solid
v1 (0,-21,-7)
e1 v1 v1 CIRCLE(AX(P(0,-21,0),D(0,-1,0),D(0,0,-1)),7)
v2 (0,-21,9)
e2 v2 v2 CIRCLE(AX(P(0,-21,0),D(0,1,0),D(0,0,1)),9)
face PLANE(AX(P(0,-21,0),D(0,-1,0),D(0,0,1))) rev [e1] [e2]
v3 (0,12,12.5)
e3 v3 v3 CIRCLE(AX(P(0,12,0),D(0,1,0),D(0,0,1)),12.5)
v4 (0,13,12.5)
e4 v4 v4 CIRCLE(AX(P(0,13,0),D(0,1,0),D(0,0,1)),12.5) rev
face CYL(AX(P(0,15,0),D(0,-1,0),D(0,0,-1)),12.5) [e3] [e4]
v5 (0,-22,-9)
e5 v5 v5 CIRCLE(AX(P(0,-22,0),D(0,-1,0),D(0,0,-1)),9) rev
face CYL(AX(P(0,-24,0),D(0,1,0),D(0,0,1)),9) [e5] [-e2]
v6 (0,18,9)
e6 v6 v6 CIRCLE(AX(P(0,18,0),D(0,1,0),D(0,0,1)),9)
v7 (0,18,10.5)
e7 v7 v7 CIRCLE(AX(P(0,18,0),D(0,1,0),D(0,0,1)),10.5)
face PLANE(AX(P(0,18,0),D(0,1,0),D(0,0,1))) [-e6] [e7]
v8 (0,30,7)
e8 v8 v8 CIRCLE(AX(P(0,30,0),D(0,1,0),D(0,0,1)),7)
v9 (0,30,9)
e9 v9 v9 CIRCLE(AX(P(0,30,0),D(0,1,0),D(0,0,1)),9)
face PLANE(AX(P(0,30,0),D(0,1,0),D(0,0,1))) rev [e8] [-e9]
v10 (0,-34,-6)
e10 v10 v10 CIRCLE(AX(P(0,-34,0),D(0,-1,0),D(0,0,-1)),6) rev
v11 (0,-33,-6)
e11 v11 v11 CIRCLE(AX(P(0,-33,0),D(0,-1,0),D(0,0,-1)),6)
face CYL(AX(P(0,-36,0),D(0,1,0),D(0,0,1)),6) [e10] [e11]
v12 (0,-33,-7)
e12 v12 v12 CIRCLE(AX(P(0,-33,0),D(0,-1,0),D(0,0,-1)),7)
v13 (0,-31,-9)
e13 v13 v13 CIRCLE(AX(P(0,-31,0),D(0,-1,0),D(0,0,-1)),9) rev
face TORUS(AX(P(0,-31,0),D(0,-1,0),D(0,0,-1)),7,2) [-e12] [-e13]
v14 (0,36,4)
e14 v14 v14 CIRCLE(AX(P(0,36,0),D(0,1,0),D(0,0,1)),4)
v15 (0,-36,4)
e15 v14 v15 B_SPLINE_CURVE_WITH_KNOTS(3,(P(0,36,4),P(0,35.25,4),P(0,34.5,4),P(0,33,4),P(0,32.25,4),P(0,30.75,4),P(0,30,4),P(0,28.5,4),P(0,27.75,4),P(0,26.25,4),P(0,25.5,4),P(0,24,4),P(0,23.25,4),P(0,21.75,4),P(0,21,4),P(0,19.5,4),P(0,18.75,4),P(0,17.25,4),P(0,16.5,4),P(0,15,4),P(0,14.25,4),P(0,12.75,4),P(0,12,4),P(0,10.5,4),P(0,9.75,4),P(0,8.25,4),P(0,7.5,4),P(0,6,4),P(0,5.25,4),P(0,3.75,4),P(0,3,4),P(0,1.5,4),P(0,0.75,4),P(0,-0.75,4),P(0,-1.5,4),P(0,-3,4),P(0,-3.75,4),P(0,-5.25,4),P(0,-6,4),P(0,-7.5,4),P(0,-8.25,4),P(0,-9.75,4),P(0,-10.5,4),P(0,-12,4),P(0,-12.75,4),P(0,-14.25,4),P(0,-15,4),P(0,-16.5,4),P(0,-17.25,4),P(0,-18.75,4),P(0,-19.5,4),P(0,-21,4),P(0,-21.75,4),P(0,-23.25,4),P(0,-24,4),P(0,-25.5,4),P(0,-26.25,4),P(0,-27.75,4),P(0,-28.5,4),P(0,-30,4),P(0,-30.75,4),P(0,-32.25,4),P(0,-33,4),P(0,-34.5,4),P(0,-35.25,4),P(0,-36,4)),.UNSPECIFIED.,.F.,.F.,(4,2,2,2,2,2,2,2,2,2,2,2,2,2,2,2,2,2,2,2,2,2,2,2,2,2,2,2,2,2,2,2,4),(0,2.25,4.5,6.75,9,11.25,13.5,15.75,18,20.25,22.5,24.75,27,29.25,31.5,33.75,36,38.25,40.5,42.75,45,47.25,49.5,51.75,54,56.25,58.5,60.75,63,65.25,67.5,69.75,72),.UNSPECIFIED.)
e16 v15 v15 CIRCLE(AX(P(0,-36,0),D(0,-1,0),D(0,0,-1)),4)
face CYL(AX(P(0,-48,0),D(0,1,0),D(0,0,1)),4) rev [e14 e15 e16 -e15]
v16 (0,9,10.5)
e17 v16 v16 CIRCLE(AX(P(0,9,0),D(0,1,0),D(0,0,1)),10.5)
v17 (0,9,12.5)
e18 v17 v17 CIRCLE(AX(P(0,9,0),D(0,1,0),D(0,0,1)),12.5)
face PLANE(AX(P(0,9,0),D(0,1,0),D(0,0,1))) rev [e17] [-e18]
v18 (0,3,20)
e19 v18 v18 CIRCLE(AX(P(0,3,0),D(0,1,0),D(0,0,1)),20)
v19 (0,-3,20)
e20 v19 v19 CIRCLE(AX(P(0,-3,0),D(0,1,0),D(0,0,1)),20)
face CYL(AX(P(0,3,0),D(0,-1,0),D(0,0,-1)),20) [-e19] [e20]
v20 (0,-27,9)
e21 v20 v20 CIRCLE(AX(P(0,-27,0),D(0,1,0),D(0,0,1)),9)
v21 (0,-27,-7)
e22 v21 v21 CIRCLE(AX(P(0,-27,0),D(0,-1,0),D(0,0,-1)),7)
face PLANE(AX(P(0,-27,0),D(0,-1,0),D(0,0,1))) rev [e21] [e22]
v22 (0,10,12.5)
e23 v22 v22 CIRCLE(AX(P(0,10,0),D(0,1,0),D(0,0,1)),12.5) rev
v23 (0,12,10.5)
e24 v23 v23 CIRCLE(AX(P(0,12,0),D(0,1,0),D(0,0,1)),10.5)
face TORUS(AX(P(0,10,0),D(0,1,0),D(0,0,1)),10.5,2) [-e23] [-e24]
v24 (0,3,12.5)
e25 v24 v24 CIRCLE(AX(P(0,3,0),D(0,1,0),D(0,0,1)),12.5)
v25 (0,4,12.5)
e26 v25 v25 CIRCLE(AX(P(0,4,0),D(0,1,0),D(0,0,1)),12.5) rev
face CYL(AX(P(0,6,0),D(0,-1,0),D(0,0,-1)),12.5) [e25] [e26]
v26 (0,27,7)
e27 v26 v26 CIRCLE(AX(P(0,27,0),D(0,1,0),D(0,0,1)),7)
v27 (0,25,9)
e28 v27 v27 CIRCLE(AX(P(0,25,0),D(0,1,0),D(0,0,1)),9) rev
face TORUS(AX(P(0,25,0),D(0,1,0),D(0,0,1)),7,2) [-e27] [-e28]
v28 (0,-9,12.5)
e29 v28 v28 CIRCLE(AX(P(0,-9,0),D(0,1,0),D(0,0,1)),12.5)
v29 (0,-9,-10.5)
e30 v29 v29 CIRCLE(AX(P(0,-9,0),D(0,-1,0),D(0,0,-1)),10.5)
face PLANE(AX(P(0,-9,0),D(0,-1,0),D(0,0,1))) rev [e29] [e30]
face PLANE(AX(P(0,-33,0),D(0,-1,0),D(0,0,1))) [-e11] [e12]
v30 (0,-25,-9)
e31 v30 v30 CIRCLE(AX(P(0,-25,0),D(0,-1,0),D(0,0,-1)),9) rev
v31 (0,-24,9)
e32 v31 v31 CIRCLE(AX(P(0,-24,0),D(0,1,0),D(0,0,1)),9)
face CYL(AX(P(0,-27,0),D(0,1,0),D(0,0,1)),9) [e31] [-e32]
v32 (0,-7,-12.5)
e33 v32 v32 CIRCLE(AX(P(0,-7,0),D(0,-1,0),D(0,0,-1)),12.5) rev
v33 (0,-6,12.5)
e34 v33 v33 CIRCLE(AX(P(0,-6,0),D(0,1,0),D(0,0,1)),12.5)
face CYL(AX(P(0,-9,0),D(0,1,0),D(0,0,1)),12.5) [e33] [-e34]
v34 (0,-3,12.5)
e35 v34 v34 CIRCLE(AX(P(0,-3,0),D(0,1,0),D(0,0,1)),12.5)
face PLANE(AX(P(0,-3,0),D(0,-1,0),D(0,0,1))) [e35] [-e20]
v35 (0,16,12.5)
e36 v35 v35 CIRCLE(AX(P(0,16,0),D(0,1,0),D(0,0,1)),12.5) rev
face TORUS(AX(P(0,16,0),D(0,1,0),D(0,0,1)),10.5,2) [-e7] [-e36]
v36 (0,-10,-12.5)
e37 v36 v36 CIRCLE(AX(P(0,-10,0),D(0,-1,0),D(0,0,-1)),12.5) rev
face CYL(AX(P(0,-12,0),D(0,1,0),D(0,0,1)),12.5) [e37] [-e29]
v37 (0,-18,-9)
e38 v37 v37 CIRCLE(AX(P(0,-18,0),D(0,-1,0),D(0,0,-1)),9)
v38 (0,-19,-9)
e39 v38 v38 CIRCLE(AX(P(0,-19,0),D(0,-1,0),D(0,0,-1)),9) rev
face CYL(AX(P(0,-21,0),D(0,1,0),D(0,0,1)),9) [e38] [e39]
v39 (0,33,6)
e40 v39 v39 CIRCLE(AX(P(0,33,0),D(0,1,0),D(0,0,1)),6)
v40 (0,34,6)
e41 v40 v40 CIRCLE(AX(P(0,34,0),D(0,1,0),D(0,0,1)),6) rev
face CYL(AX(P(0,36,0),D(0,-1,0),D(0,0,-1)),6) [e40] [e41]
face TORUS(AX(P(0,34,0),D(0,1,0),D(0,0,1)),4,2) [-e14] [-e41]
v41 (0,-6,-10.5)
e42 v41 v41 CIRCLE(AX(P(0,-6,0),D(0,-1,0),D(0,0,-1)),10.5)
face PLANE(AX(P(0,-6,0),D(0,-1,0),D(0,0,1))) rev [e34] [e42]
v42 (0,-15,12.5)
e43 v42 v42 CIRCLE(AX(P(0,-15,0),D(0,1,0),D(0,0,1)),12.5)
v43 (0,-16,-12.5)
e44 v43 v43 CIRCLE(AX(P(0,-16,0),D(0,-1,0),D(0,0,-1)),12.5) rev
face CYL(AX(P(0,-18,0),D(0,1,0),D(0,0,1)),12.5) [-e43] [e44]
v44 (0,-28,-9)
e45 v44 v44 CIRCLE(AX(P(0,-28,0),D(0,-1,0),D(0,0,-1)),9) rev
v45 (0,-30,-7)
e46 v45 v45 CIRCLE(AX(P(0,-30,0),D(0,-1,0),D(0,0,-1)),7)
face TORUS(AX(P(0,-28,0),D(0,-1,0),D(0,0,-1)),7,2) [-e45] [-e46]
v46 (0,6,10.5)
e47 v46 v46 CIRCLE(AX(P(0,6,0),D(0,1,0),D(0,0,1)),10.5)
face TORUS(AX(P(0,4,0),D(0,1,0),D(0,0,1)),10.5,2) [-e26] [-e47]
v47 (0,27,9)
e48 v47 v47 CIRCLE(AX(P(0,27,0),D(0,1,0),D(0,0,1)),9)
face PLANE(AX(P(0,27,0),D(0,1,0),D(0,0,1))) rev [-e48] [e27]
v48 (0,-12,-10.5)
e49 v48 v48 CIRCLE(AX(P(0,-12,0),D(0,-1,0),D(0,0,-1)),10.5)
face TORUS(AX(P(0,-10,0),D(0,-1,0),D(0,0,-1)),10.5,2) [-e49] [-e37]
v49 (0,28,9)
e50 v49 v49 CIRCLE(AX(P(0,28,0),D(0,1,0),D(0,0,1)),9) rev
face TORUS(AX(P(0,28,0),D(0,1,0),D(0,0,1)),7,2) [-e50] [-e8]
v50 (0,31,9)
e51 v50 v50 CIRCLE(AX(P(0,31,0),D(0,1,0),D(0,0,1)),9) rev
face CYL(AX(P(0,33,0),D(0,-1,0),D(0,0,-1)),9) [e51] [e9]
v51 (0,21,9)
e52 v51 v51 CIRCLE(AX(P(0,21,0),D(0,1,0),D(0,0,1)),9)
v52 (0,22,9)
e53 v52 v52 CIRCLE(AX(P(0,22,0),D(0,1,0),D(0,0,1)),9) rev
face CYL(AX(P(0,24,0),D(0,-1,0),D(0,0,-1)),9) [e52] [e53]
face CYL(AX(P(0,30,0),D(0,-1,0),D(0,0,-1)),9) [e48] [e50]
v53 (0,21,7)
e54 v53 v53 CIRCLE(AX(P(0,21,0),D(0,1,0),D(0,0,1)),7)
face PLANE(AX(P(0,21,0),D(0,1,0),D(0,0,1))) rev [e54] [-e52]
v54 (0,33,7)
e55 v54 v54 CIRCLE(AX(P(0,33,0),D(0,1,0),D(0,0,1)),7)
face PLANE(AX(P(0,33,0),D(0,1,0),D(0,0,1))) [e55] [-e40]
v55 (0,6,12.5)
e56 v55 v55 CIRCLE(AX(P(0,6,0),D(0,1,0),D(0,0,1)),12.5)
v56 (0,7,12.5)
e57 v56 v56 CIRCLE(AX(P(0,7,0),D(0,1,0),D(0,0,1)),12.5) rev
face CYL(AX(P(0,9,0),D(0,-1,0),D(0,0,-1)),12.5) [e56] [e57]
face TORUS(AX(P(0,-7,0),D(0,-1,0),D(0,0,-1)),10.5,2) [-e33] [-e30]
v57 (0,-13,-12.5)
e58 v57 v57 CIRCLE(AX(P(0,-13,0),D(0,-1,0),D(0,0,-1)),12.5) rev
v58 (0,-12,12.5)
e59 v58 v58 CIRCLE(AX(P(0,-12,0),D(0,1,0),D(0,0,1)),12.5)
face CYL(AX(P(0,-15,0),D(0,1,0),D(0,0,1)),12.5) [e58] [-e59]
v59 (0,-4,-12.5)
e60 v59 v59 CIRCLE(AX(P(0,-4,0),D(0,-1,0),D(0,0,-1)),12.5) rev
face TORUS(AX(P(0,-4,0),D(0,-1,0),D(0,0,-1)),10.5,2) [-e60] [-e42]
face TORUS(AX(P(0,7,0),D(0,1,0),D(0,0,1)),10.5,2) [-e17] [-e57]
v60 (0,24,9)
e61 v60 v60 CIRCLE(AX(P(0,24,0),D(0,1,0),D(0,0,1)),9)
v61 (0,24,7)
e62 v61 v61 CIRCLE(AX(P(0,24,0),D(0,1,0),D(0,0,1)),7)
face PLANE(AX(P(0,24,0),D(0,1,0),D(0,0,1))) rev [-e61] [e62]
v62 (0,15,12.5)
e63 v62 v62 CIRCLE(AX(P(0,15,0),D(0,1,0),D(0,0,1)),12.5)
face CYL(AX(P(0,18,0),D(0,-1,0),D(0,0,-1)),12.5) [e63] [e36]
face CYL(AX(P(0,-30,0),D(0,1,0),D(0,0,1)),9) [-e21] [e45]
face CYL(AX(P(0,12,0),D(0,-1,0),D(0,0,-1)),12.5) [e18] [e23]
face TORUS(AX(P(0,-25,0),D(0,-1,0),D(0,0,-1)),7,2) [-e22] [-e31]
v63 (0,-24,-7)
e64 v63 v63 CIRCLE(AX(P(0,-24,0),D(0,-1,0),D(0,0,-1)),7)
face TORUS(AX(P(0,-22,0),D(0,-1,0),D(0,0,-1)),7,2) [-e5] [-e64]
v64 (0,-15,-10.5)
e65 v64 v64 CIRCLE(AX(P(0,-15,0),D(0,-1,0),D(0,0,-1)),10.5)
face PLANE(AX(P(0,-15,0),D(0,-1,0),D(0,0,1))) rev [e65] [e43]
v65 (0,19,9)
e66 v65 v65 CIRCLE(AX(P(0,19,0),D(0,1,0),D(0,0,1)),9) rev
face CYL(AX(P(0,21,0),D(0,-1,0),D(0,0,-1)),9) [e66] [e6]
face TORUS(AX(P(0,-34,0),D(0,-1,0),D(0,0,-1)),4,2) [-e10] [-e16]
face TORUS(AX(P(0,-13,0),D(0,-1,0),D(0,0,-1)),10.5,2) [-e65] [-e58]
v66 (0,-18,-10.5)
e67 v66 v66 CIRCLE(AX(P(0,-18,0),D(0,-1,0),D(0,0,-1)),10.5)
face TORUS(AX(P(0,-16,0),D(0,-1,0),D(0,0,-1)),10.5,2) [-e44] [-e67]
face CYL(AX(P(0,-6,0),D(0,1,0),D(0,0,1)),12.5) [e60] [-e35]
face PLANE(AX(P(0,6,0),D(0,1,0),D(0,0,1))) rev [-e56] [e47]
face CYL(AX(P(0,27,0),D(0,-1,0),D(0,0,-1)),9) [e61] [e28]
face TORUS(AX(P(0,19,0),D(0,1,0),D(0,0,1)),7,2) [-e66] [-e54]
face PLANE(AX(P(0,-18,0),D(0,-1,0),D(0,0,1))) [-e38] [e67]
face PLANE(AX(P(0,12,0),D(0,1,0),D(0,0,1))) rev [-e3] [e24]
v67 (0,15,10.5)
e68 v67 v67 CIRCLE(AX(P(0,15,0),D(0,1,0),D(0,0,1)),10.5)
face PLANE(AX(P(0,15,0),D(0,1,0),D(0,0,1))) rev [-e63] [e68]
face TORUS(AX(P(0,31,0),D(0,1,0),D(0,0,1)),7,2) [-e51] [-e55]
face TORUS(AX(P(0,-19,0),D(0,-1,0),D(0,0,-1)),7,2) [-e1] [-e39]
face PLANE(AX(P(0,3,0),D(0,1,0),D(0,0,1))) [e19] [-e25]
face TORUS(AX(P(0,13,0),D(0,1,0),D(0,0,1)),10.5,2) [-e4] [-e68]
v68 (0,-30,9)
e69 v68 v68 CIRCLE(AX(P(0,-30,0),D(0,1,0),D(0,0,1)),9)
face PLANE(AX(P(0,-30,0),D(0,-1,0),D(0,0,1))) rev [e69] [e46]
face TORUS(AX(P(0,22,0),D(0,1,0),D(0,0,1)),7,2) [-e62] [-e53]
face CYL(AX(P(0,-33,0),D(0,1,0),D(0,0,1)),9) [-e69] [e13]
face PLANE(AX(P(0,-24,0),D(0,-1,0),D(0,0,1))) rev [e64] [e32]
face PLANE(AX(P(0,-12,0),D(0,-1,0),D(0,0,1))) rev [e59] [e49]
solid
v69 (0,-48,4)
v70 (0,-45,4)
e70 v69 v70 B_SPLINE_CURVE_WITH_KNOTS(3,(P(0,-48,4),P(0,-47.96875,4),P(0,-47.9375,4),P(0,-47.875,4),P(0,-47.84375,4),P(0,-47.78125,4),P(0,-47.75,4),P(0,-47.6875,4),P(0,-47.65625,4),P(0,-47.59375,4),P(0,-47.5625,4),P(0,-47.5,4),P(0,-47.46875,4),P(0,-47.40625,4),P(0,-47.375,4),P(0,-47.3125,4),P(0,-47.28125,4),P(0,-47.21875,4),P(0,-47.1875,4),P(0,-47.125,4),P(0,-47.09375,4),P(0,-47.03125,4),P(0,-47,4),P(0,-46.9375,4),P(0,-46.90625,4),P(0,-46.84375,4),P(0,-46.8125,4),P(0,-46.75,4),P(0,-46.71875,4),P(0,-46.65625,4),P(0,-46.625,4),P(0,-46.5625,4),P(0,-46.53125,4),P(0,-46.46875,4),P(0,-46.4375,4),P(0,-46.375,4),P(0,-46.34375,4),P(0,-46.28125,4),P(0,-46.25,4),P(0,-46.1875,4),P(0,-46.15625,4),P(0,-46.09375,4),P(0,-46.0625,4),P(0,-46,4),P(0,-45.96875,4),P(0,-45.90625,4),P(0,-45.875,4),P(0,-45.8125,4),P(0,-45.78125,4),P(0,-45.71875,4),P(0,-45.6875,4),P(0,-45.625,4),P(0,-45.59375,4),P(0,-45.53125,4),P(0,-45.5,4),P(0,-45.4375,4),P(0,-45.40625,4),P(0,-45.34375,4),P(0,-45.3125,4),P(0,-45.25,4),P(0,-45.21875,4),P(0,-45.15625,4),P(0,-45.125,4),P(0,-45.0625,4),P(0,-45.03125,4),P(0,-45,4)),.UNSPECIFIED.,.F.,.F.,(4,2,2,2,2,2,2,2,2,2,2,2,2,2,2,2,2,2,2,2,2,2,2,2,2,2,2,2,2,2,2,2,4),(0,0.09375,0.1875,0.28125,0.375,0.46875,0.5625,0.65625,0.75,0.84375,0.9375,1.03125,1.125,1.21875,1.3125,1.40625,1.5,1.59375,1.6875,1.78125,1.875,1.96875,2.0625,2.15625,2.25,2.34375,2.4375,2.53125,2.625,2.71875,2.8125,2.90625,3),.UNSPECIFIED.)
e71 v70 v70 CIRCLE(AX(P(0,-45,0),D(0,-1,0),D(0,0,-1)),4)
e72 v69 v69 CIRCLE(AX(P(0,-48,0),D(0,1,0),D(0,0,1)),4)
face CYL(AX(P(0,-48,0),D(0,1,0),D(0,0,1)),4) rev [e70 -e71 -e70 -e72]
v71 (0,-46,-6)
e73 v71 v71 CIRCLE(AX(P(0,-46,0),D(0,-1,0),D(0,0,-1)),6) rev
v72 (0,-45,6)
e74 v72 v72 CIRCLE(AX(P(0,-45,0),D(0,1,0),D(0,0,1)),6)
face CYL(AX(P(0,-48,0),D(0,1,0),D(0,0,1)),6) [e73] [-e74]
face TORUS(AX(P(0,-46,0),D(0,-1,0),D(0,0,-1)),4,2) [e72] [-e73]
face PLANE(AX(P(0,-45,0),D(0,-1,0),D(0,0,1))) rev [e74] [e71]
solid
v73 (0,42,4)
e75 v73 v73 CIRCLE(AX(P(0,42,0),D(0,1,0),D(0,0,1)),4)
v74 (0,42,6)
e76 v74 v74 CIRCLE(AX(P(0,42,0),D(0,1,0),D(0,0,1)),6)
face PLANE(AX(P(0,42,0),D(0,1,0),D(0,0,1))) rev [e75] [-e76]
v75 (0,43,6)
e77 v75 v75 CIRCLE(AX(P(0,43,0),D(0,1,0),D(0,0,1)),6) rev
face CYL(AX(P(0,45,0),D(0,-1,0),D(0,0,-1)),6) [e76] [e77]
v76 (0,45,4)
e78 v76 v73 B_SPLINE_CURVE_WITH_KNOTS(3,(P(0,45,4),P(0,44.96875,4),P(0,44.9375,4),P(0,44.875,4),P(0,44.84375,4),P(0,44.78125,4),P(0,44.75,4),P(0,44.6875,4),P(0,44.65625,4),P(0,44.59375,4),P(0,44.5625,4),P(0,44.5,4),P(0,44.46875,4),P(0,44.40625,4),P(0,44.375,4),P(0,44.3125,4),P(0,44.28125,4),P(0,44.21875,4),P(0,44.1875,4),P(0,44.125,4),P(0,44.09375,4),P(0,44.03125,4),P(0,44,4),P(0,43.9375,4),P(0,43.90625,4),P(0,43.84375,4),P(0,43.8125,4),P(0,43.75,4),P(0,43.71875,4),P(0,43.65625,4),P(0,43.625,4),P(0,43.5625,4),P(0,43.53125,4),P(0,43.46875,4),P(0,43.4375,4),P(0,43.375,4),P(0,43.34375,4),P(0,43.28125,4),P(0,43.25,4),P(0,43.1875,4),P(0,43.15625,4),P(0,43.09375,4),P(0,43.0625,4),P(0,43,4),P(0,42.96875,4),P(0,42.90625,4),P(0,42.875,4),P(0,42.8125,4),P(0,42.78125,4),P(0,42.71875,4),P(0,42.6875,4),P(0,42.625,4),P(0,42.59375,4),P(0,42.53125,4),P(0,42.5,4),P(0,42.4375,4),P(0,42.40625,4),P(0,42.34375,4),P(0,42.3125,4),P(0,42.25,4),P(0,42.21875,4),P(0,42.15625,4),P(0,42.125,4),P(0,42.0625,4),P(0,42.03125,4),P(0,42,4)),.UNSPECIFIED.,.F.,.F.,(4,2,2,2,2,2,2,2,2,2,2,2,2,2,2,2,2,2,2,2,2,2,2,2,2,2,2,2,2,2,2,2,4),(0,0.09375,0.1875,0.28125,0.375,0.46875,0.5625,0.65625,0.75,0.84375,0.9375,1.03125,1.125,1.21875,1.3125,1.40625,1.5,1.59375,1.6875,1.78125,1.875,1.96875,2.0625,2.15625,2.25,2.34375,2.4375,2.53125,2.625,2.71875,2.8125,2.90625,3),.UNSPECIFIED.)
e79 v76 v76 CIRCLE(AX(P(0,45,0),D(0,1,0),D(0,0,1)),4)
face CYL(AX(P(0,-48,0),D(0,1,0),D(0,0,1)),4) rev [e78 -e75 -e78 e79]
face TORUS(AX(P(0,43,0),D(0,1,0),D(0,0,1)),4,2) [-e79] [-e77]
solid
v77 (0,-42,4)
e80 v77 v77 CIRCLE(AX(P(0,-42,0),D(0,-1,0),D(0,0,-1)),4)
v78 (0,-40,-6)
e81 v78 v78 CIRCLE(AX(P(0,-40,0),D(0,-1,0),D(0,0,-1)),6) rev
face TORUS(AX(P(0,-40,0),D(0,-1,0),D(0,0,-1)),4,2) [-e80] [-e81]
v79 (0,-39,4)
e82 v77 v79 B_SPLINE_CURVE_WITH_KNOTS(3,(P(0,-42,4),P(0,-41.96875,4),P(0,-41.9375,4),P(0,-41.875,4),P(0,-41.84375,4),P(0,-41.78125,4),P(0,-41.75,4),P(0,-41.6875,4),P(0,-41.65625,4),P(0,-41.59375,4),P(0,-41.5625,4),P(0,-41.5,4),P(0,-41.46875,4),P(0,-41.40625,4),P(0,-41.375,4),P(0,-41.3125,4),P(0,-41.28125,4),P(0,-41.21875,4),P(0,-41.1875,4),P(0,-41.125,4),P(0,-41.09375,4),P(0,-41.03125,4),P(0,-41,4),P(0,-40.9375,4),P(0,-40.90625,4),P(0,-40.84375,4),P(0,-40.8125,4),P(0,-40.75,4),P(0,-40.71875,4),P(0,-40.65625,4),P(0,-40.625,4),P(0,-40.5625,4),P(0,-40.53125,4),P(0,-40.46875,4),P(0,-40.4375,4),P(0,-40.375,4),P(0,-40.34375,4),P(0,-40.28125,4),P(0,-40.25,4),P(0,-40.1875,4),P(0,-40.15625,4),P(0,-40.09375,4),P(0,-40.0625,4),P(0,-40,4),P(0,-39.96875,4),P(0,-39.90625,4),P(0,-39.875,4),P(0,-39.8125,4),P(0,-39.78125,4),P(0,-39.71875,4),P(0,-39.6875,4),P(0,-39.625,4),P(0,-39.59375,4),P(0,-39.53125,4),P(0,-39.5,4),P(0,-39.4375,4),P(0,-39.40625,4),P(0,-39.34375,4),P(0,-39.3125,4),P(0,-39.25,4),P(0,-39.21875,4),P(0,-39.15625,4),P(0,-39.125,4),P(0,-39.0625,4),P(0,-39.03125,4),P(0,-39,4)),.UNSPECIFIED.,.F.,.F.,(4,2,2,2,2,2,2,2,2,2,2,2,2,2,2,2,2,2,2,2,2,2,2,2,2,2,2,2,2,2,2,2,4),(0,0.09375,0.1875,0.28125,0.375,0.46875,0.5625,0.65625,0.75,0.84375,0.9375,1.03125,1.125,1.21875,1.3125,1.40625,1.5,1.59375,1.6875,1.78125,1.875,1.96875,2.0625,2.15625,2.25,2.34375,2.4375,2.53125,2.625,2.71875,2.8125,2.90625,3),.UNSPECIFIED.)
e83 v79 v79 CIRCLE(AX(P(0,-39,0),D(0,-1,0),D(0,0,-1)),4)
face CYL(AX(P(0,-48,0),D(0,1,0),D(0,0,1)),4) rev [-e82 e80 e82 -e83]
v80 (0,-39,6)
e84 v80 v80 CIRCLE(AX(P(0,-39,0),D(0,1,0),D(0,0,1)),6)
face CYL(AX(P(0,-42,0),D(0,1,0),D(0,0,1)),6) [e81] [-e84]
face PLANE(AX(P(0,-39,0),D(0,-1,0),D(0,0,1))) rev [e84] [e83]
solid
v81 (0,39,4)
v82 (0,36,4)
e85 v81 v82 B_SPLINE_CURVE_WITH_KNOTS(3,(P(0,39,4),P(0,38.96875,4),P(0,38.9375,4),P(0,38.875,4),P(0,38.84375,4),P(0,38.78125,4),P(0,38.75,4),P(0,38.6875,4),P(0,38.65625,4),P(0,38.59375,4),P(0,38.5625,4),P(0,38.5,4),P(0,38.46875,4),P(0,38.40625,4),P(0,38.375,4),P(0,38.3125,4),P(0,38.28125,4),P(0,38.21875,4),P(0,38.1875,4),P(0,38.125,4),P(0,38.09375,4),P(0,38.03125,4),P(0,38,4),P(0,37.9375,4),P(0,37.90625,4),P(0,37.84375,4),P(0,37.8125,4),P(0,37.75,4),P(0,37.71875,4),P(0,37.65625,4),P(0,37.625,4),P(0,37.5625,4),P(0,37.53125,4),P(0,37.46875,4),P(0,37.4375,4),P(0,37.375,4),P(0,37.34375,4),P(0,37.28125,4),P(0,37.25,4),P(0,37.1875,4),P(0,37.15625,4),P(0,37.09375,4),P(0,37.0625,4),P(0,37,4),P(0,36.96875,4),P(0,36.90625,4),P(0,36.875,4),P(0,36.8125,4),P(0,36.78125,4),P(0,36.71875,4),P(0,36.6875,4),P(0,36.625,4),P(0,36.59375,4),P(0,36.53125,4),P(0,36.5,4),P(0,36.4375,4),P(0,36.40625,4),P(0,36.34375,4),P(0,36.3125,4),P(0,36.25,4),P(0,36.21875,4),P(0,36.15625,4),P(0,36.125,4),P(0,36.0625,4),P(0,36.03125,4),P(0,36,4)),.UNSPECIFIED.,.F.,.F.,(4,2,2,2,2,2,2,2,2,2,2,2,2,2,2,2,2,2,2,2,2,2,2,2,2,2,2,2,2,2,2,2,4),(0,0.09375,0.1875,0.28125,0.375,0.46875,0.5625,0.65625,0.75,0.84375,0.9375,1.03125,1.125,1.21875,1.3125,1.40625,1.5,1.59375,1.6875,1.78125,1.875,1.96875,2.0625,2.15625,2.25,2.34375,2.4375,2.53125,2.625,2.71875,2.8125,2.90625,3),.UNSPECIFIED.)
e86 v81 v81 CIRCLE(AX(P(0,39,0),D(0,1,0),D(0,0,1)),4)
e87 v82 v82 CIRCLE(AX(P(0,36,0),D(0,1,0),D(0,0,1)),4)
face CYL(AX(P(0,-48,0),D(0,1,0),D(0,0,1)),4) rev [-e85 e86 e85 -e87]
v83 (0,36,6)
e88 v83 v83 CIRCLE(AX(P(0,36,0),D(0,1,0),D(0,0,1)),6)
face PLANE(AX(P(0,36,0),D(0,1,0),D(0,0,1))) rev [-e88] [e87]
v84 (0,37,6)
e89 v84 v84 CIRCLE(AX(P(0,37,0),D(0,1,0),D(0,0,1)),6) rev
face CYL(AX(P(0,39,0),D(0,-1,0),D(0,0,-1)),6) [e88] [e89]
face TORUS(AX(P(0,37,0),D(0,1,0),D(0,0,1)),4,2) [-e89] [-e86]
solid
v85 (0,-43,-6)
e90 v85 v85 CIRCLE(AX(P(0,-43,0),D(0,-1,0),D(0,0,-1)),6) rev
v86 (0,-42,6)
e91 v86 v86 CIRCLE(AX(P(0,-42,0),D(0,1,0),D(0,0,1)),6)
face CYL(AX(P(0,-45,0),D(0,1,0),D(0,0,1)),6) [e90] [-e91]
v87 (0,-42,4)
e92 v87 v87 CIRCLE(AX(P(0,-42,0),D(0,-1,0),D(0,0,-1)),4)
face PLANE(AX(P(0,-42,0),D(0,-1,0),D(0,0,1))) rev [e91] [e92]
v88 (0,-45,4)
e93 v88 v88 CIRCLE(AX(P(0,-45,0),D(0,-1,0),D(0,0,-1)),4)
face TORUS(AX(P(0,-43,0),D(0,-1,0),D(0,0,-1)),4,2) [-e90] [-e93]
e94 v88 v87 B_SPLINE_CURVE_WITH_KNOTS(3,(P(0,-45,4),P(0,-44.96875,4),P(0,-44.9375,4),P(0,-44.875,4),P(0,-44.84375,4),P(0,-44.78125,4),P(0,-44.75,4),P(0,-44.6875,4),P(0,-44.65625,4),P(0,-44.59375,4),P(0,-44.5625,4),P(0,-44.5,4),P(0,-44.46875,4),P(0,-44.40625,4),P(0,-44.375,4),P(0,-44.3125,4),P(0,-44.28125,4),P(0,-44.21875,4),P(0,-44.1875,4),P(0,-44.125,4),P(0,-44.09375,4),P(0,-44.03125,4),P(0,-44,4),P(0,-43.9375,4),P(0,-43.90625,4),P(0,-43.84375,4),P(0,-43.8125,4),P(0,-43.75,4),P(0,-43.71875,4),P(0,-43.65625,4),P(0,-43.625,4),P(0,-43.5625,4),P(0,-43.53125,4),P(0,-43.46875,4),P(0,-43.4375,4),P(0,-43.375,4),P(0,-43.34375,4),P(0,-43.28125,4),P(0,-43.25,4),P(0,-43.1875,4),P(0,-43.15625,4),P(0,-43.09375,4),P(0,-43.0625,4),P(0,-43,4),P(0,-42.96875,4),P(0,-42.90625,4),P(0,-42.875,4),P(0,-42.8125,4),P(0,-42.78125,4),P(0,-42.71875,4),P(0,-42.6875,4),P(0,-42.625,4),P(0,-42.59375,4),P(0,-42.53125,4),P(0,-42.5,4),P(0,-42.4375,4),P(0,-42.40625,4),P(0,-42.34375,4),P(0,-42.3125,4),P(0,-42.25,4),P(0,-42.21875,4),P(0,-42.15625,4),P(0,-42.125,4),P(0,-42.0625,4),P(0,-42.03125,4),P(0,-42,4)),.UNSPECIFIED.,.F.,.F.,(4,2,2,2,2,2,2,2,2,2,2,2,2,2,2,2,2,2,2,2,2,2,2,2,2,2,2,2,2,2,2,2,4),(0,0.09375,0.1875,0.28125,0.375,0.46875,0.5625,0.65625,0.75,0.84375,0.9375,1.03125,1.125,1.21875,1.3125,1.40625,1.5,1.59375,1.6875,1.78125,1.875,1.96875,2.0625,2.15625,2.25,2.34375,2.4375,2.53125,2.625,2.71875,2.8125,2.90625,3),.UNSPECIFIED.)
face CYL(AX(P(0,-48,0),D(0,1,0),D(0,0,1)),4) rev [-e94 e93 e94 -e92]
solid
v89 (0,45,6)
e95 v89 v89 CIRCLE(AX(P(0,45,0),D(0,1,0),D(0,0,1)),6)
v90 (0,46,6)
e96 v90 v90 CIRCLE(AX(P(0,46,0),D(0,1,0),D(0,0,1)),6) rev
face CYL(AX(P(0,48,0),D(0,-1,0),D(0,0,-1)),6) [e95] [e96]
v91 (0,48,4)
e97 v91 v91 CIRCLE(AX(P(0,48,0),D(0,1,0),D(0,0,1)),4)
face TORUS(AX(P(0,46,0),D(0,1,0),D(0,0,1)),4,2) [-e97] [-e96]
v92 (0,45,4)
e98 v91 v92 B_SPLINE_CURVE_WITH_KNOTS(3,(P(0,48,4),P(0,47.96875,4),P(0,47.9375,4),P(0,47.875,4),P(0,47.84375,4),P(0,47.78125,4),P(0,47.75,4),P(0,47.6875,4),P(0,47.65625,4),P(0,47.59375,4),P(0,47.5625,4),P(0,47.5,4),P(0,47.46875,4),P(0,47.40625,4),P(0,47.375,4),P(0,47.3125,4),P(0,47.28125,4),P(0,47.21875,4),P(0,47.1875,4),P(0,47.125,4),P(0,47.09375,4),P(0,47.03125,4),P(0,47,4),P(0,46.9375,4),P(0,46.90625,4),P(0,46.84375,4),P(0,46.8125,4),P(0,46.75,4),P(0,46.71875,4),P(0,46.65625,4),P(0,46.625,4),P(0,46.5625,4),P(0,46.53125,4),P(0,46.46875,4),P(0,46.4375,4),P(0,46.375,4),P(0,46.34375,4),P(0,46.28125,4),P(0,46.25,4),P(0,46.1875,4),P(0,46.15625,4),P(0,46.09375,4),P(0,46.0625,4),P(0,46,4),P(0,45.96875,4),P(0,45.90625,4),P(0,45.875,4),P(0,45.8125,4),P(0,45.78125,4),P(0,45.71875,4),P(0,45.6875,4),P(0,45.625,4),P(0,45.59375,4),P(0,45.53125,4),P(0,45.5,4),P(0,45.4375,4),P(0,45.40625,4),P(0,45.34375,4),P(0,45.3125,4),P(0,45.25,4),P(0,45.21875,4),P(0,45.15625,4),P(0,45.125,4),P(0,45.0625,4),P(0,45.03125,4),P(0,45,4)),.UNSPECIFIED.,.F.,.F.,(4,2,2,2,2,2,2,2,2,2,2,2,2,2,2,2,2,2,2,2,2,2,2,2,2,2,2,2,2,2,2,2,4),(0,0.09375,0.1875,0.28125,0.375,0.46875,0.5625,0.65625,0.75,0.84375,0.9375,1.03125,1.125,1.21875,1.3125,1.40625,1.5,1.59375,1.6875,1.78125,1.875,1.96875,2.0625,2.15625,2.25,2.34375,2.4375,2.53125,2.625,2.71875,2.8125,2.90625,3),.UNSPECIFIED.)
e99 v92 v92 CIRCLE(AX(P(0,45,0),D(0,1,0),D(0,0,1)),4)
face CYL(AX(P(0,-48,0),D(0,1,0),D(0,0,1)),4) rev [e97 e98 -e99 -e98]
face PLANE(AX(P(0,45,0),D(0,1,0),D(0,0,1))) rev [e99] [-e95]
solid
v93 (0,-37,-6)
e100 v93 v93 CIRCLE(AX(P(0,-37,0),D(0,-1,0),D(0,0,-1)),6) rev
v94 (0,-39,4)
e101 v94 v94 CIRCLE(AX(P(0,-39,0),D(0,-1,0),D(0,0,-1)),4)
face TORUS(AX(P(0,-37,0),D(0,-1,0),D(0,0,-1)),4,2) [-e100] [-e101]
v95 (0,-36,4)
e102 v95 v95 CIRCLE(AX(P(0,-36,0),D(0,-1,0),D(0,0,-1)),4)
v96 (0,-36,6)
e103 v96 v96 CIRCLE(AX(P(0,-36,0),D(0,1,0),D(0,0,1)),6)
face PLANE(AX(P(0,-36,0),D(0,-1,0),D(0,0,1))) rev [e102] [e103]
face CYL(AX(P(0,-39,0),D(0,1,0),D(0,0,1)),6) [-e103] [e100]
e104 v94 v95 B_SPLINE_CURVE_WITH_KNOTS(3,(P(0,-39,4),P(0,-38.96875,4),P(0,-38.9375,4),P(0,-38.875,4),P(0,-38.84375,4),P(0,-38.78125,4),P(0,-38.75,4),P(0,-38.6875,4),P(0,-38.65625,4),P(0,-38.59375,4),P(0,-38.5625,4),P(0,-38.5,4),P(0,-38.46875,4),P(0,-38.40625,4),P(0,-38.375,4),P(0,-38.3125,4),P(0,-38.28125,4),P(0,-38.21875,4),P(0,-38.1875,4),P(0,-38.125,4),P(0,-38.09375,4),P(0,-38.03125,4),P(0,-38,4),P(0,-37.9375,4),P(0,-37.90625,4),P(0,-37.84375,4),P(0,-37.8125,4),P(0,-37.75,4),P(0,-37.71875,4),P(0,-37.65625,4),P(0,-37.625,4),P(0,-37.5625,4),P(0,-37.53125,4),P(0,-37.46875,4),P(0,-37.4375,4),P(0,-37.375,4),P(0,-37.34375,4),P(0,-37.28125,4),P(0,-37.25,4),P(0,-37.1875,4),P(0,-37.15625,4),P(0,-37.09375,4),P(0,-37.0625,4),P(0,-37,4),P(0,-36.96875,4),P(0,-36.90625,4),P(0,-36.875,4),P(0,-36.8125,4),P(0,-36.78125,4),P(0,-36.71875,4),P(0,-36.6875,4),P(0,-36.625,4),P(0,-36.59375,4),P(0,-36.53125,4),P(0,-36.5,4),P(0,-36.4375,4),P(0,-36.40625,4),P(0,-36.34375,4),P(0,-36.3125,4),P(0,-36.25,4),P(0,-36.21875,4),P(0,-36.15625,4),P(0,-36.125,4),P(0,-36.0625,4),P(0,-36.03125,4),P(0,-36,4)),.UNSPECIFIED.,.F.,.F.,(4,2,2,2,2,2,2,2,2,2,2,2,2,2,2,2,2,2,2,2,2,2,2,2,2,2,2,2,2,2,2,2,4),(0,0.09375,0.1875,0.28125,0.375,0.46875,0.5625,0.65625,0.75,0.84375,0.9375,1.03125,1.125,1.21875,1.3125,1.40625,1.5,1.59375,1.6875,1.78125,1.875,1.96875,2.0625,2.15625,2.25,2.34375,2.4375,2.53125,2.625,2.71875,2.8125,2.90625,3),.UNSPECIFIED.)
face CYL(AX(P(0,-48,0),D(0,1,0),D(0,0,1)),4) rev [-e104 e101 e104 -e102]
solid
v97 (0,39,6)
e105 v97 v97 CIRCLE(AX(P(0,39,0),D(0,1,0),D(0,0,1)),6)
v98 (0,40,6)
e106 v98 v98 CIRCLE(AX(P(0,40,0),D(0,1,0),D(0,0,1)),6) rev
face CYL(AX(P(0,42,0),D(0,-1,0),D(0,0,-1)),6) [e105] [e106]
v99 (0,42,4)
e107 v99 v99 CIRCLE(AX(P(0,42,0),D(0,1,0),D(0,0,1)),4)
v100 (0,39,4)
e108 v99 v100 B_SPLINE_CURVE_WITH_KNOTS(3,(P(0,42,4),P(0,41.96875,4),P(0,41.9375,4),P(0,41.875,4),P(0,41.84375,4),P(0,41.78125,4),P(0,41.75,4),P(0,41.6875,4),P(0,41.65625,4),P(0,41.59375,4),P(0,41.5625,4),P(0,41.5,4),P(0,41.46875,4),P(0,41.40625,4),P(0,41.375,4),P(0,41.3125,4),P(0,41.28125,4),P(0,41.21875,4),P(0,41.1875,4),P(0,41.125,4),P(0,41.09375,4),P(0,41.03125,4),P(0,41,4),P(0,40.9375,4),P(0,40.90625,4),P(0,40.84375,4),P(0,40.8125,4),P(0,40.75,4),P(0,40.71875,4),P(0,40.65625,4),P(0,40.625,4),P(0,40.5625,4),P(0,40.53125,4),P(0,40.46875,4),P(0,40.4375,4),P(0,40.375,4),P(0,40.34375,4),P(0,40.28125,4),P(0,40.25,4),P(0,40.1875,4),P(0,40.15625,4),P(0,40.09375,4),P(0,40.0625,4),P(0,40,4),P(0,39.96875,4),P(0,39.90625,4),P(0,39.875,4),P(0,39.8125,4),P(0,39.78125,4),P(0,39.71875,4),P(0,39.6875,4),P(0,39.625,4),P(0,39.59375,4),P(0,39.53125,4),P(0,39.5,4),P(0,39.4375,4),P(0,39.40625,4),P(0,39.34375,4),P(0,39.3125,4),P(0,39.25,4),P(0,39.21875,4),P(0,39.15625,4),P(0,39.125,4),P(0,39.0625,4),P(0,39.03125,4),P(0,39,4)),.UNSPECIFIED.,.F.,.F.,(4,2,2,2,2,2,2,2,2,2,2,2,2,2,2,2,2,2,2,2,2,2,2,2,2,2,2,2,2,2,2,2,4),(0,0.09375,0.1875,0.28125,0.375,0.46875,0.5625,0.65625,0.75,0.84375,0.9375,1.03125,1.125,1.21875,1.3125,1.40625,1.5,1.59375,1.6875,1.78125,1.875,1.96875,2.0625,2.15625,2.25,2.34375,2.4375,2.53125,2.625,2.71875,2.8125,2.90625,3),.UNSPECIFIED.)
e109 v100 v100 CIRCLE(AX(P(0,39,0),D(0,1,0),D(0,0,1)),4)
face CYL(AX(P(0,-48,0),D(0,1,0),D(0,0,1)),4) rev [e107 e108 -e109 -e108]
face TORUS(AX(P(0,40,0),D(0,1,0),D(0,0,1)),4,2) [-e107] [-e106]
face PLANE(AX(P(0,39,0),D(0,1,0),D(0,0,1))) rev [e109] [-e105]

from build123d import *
from build123d.topology import SkipClean

# Parameters (mm, degrees)
SKETCH1_R            = 20
BOSS_EXTRUDE1_DEPTH  = 3
SKETCH2_R            = 12.5
BOSS_EXTRUDE2_DEPTH  = 3
FILLET1_R            = 2
SKETCH3_R            = 12.5
BOSS_EXTRUDE3_DEPTH  = 3
FILLET2_R            = 2
SKETCH4_R            = 12.5
BOSS_EXTRUDE4_DEPTH  = 3
FILLET3_R            = 2
SKETCH5_R            = 12.5
BOSS_EXTRUDE5_DEPTH  = 3
FILLET4_R            = 2
SKETCH6_R            = 12.5
BOSS_EXTRUDE6_DEPTH  = 3
FILLET5_R            = 2
SKETCH7_R            = 9
BOSS_EXTRUDE7_DEPTH  = 3
FILLET6_R            = 2
SKETCH8_R            = 9
BOSS_EXTRUDE8_DEPTH  = 3
FILLET7_R            = 2
SKETCH9_R            = 9
BOSS_EXTRUDE9_DEPTH  = 3
FILLET8_R            = 2
SKETCH10_R           = 9
BOSS_EXTRUDE10_DEPTH = 3
FILLET9_R            = 2
SKETCH11_R           = 9
BOSS_EXTRUDE11_DEPTH = 3
FILLET10_R           = 2
SKETCH12_R           = 6
BOSS_EXTRUDE12_DEPTH = 3
FILLET11_R           = 2
SKETCH13_R           = 6
BOSS_EXTRUDE13_DEPTH = 3
FILLET12_R           = 2
SKETCH14_R           = 6
BOSS_EXTRUDE14_DEPTH = 3
FILLET13_R           = 2
SKETCH15_R           = 6
BOSS_EXTRUDE15_DEPTH = 3
FILLET14_R           = 2
SKETCH16_R           = 6
BOSS_EXTRUDE16_DEPTH = 3
FILLET15_R           = 2
SKETCH17_R           = 4
CUT_EXTRUDE1_DEPTH   = 101.079968121


# Read off the part's stored shape, not the designer's step: Mirror1
with BuildPart() as part:
    # Sketch1 → Boss-Extrude1 (new body)
    with BuildSketch(Plane(origin=(0, 0, 0), x_dir=(1, 0, 0), z_dir=(0, 1, 0))):
        with Locations(Location((0, 0, 0), (0, 0, 270))):
            Circle(SKETCH1_R)
    extrude(amount=BOSS_EXTRUDE1_DEPTH)

    # Sketch2 → Boss-Extrude2 (add)
    with BuildSketch(Plane(origin=(0, 3, 0), x_dir=(1, 0, 0), z_dir=(0, 1, 0))):
        with Locations(Location((0, 0, 0), (0, 0, 270))):
            Circle(SKETCH2_R)
    extrude(amount=BOSS_EXTRUDE2_DEPTH)

    # Fillet1
    fillet1_edges = [part.edges().sort_by_distance(p)[0] for p in [
        (0, 6, -12.5),
    ]]
    fillet(fillet1_edges, radius=FILLET1_R)

    # Sketch3 → Boss-Extrude3 (add)
    with BuildSketch(Plane(origin=(0, 6, 0), x_dir=(1, 0, 0), z_dir=(0, 1, 0))):
        with Locations(Location((0, 0, 0), (0, 0, 270))):
            Circle(SKETCH3_R)
    extrude(amount=BOSS_EXTRUDE3_DEPTH)

    # Fillet2
    fillet2_edges = [part.edges().sort_by_distance(p)[0] for p in [
        (0, 9, -12.5),
    ]]
    fillet(fillet2_edges, radius=FILLET2_R)

    # Sketch4 → Boss-Extrude4 (add)
    with BuildSketch(Plane(origin=(0, 9, 0), x_dir=(1, 0, 0), z_dir=(0, 1, 0))):
        with Locations(Location((0, 0, 0), (0, 0, 270))):
            Circle(SKETCH4_R)
    extrude(amount=BOSS_EXTRUDE4_DEPTH)

    # Fillet3
    fillet3_edges = [part.edges().sort_by_distance(p)[0] for p in [
        (0, 12, -12.5),
    ]]
    fillet(fillet3_edges, radius=FILLET3_R)

    # Sketch5 → Boss-Extrude5 (add)
    with BuildSketch(Plane(origin=(0, 12, 0), x_dir=(1, 0, 0), z_dir=(0, 1, 0))):
        with Locations(Location((0, 0, 0), (0, 0, 270))):
            Circle(SKETCH5_R)
    extrude(amount=BOSS_EXTRUDE5_DEPTH)

    # Fillet4
    fillet4_edges = [part.edges().sort_by_distance(p)[0] for p in [
        (0, 15, -12.5),
    ]]
    fillet(fillet4_edges, radius=FILLET4_R)

    # Sketch6 → Boss-Extrude6 (add)
    with BuildSketch(Plane(origin=(0, 15, 0), x_dir=(1, 0, 0), z_dir=(0, 1, 0))):
        with Locations(Location((0, 0, 0), (0, 0, 270))):
            Circle(SKETCH6_R)
    extrude(amount=BOSS_EXTRUDE6_DEPTH)

    # Fillet5
    fillet5_edges = [part.edges().sort_by_distance(p)[0] for p in [
        (0, 18, -12.5),
    ]]
    fillet(fillet5_edges, radius=FILLET5_R)

    # Sketch7 → Boss-Extrude7 (add)
    with BuildSketch(Plane(origin=(0, 18, 0), x_dir=(1, 0, 0), z_dir=(0, 1, 0))):
        with Locations(Location((0, 0, 0), (0, 0, 270))):
            Circle(SKETCH7_R)
    extrude(amount=BOSS_EXTRUDE7_DEPTH)

    # Fillet6
    fillet6_edges = [part.edges().sort_by_distance(p)[0] for p in [
        (0, 21, -9),
    ]]
    fillet(fillet6_edges, radius=FILLET6_R)

    # Sketch8 → Boss-Extrude8 (add)
    with BuildSketch(Plane(origin=(0, 21, 0), x_dir=(1, 0, 0), z_dir=(0, 1, 0))):
        with Locations(Location((0, 0, 0), (0, 0, 270))):
            Circle(SKETCH8_R)
    extrude(amount=BOSS_EXTRUDE8_DEPTH)

    # Fillet7
    fillet7_edges = [part.edges().sort_by_distance(p)[0] for p in [
        (0, 24, -9),
    ]]
    fillet(fillet7_edges, radius=FILLET7_R)

    # Sketch9 → Boss-Extrude9 (add)
    with BuildSketch(Plane(origin=(0, 24, 0), x_dir=(1, 0, 0), z_dir=(0, 1, 0))):
        with Locations(Location((0, 0, 0), (0, 0, 270))):
            Circle(SKETCH9_R)
    extrude(amount=BOSS_EXTRUDE9_DEPTH)

    # Fillet8
    fillet8_edges = [part.edges().sort_by_distance(p)[0] for p in [
        (0, 27, -9),
    ]]
    fillet(fillet8_edges, radius=FILLET8_R)

    # Sketch10 → Boss-Extrude10 (add)
    with BuildSketch(Plane(origin=(0, 27, 0), x_dir=(1, 0, 0), z_dir=(0, 1, 0))):
        with Locations(Location((0, 0, 0), (0, 0, 270))):
            Circle(SKETCH10_R)
    extrude(amount=BOSS_EXTRUDE10_DEPTH)

    # Fillet9
    fillet9_edges = [part.edges().sort_by_distance(p)[0] for p in [
        (0, 30, -9),
    ]]
    fillet(fillet9_edges, radius=FILLET9_R)

    # Sketch11 → Boss-Extrude11 (add)
    with BuildSketch(Plane(origin=(0, 30, 0), x_dir=(1, 0, 0), z_dir=(0, 1, 0))):
        with Locations(Location((0, 0, 0), (0, 0, 270))):
            Circle(SKETCH11_R)
    extrude(amount=BOSS_EXTRUDE11_DEPTH)

    # Fillet10
    fillet10_edges = [part.edges().sort_by_distance(p)[0] for p in [
        (0, 33, -9),
    ]]
    fillet(fillet10_edges, radius=FILLET10_R)

    # Sketch12 → Boss-Extrude12 (add)
    with BuildSketch(Plane(origin=(0, 33, 0), x_dir=(1, 0, 0), z_dir=(0, 1, 0))):
        with Locations(Location((0, 0, 0), (0, 0, 270))):
            Circle(SKETCH12_R)
    extrude(amount=BOSS_EXTRUDE12_DEPTH)

    # Fillet11
    fillet11_edges = [part.edges().sort_by_distance(p)[0] for p in [
        (0, 36, -6),
    ]]
    fillet(fillet11_edges, radius=FILLET11_R)

    # Sketch13 → Boss-Extrude13 (add)
    with BuildSketch(Plane(origin=(0, 36, 0), x_dir=(1, 0, 0), z_dir=(0, 1, 0))):
        with Locations(Location((0, 0, 0), (0, 0, 270))):
            Circle(SKETCH13_R)
    extrude(amount=BOSS_EXTRUDE13_DEPTH)

    # Fillet12
    fillet12_edges = [part.edges().sort_by_distance(p)[0] for p in [
        (0, 39, -6),
    ]]
    fillet(fillet12_edges, radius=FILLET12_R)

    # Sketch14 → Boss-Extrude14 (add)
    with BuildSketch(Plane(origin=(0, 39, 0), x_dir=(1, 0, 0), z_dir=(0, 1, 0))):
        with Locations(Location((0, 0, 0), (0, 0, 270))):
            Circle(SKETCH14_R)
    extrude(amount=BOSS_EXTRUDE14_DEPTH)

    # Fillet13
    fillet13_edges = [part.edges().sort_by_distance(p)[0] for p in [
        (0, 42, -6),
    ]]
    fillet(fillet13_edges, radius=FILLET13_R)

    # Sketch15 → Boss-Extrude15 (add)
    with BuildSketch(Plane(origin=(0, 42, 0), x_dir=(1, 0, 0), z_dir=(0, 1, 0))):
        with Locations(Location((0, 0, 0), (0, 0, 270))):
            Circle(SKETCH15_R)
    extrude(amount=BOSS_EXTRUDE15_DEPTH)

    # Fillet14
    fillet14_edges = [part.edges().sort_by_distance(p)[0] for p in [
        (0, 45, -6),
    ]]
    fillet(fillet14_edges, radius=FILLET14_R)

    # Sketch16 → Boss-Extrude16 (add)
    with BuildSketch(Plane(origin=(0, 45, 0), x_dir=(1, 0, 0), z_dir=(0, 1, 0))):
        with Locations(Location((0, 0, 0), (0, 0, 270))):
            Circle(SKETCH16_R)
    extrude(amount=BOSS_EXTRUDE16_DEPTH)

    # Fillet15
    fillet15_edges = [part.edges().sort_by_distance(p)[0] for p in [
        (0, 48, -6),
    ]]
    fillet(fillet15_edges, radius=FILLET15_R)

    # Mirror1 outline → Mirror1 (revolve)
    with SkipClean():  # the faces are left unmerged after this step: merging them gives an invalid solid
        with BuildSketch(Plane.XY):
            with BuildLine():
                Line((20, -3), (20, 0))
                Line((20, 0), (0, 0))
                Line((0, 0), (0, -48))
                Line((0, -48), (4, -48))
                ThreePointArc((4, -48), (5.414213562, -47.414213562), (6, -46))
                Line((6, -46), (6, -45))
                Line((6, -45), (4, -45))
                ThreePointArc((4, -45), (5.414213562, -44.414213562), (6, -43))
                Line((6, -43), (6, -42))
                Line((6, -42), (4, -42))
                ThreePointArc((4, -42), (5.414213562, -41.414213562), (6, -40))
                Line((6, -40), (6, -39))
                Line((6, -39), (4, -39))
                ThreePointArc((4, -39), (5.414213562, -38.414213562), (6, -37))
                Line((6, -37), (6, -36))
                Line((6, -36), (4, -36))
                ThreePointArc((4, -36), (5.414213562, -35.414213562), (6, -34))
                Line((6, -34), (6, -33))
                Line((6, -33), (7, -33))
                ThreePointArc((7, -33), (8.414213562, -32.414213562), (9, -31))
                Line((9, -31), (9, -30))
                Line((9, -30), (7, -30))
                ThreePointArc((7, -30), (8.414213562, -29.414213562), (9, -28))
                Line((9, -28), (9, -27))
                Line((9, -27), (7, -27))
                ThreePointArc((7, -27), (8.414213562, -26.414213562), (9, -25))
                Line((9, -25), (9, -24))
                Line((9, -24), (7, -24))
                ThreePointArc((7, -24), (8.414213562, -23.414213562), (9, -22))
                Line((9, -22), (9, -21))
                Line((9, -21), (7, -21))
                ThreePointArc((7, -21), (8.414213562, -20.414213562), (9, -19))
                Line((9, -19), (9, -18))
                Line((9, -18), (10.5, -18))
                ThreePointArc((10.5, -18), (11.914213562, -17.414213562), (12.5, -16))
                Line((12.5, -16), (12.5, -15))
                Line((12.5, -15), (10.5, -15))
                ThreePointArc((10.5, -15), (11.914213562, -14.414213562), (12.5, -13))
                Line((12.5, -13), (12.5, -12))
                Line((12.5, -12), (10.5, -12))
                ThreePointArc((10.5, -12), (11.914213562, -11.414213562), (12.5, -10))
                Line((12.5, -10), (12.5, -9))
                Line((12.5, -9), (10.5, -9))
                ThreePointArc((10.5, -9), (11.914213562, -8.414213562), (12.5, -7))
                Line((12.5, -7), (12.5, -6))
                Line((12.5, -6), (10.5, -6))
                ThreePointArc((10.5, -6), (11.914213562, -5.414213562), (12.5, -4))
                Line((12.5, -4), (12.5, -3))
                Line((12.5, -3), (20, -3))
            make_face()
        revolve(axis=Axis((0, 0, 0), (0, 1, 0)))
    add(part.part.scale(1), mode=Mode.REPLACE)  # the faces are merged on a copy

    # Sketch17 → Cut-Extrude1 (cut, through all)
    with BuildSketch(Plane(origin=(0, 48, 0), x_dir=(1, 0, 0), z_dir=(0, 1, 0))):
        with Locations(Location((0, 0, 0), (0, 0, 270))):
            Circle(SKETCH17_R)
    extrude(amount=-CUT_EXTRUDE1_DEPTH, mode=Mode.SUBTRACT)


with BuildPart() as cut_extrude1_piece_1:
    # of the separate pieces the step leaves, piece 1, a body of its own (cut_extrude1_pieces)
    add(part.part.solids().sort_by_distance((0, 34, 6))[0])


with BuildPart() as cut_extrude1_piece_2:
    # of the separate pieces the step leaves, piece 2, a body of its own (cut_extrude1_pieces)
    add(part.part.solids().sort_by_distance((0, 43, 6))[0])


with BuildPart() as cut_extrude1_piece_3:
    # of the separate pieces the step leaves, piece 3, a body of its own (cut_extrude1_pieces)
    add(part.part.solids().sort_by_distance((0, 40, 6))[0])


with BuildPart() as cut_extrude1_piece_4:
    # of the separate pieces the step leaves, piece 4, a body of its own (cut_extrude1_pieces)
    add(part.part.solids().sort_by_distance((0, 37, 6))[0])


with BuildPart() as cut_extrude1_piece_5:
    # of the separate pieces the step leaves, piece 5, a body of its own (cut_extrude1_pieces)
    add(part.part.solids().sort_by_distance((0, 46, 6))[0])


with BuildPart() as cut_extrude1_piece_6:
    # of the separate pieces the step leaves, piece 6, a body of its own (cut_extrude1_pieces)
    add(part.part.solids().sort_by_distance((6, -36, 0))[0])


with BuildPart() as cut_extrude1_piece_7:
    # of the separate pieces the step leaves, piece 7, a body of its own (cut_extrude1_pieces)
    add(part.part.solids().sort_by_distance((6, -39, 0))[0])


with BuildPart() as cut_extrude1_piece_8:
    # of the separate pieces the step leaves, piece 8, a body of its own (cut_extrude1_pieces)
    add(part.part.solids().sort_by_distance((6, -42, 0))[0])


with BuildPart() as cut_extrude1_piece_9:
    # of the separate pieces the step leaves, piece 9, a body of its own (cut_extrude1_pieces)
    add(part.part.solids().sort_by_distance((6, -45, 0))[0])


solid = Compound([cut_extrude1_piece_1.part, cut_extrude1_piece_2.part, cut_extrude1_piece_3.part, cut_extrude1_piece_4.part, cut_extrude1_piece_5.part, cut_extrude1_piece_6.part, cut_extrude1_piece_7.part, cut_extrude1_piece_8.part, cut_extrude1_piece_9.part])
